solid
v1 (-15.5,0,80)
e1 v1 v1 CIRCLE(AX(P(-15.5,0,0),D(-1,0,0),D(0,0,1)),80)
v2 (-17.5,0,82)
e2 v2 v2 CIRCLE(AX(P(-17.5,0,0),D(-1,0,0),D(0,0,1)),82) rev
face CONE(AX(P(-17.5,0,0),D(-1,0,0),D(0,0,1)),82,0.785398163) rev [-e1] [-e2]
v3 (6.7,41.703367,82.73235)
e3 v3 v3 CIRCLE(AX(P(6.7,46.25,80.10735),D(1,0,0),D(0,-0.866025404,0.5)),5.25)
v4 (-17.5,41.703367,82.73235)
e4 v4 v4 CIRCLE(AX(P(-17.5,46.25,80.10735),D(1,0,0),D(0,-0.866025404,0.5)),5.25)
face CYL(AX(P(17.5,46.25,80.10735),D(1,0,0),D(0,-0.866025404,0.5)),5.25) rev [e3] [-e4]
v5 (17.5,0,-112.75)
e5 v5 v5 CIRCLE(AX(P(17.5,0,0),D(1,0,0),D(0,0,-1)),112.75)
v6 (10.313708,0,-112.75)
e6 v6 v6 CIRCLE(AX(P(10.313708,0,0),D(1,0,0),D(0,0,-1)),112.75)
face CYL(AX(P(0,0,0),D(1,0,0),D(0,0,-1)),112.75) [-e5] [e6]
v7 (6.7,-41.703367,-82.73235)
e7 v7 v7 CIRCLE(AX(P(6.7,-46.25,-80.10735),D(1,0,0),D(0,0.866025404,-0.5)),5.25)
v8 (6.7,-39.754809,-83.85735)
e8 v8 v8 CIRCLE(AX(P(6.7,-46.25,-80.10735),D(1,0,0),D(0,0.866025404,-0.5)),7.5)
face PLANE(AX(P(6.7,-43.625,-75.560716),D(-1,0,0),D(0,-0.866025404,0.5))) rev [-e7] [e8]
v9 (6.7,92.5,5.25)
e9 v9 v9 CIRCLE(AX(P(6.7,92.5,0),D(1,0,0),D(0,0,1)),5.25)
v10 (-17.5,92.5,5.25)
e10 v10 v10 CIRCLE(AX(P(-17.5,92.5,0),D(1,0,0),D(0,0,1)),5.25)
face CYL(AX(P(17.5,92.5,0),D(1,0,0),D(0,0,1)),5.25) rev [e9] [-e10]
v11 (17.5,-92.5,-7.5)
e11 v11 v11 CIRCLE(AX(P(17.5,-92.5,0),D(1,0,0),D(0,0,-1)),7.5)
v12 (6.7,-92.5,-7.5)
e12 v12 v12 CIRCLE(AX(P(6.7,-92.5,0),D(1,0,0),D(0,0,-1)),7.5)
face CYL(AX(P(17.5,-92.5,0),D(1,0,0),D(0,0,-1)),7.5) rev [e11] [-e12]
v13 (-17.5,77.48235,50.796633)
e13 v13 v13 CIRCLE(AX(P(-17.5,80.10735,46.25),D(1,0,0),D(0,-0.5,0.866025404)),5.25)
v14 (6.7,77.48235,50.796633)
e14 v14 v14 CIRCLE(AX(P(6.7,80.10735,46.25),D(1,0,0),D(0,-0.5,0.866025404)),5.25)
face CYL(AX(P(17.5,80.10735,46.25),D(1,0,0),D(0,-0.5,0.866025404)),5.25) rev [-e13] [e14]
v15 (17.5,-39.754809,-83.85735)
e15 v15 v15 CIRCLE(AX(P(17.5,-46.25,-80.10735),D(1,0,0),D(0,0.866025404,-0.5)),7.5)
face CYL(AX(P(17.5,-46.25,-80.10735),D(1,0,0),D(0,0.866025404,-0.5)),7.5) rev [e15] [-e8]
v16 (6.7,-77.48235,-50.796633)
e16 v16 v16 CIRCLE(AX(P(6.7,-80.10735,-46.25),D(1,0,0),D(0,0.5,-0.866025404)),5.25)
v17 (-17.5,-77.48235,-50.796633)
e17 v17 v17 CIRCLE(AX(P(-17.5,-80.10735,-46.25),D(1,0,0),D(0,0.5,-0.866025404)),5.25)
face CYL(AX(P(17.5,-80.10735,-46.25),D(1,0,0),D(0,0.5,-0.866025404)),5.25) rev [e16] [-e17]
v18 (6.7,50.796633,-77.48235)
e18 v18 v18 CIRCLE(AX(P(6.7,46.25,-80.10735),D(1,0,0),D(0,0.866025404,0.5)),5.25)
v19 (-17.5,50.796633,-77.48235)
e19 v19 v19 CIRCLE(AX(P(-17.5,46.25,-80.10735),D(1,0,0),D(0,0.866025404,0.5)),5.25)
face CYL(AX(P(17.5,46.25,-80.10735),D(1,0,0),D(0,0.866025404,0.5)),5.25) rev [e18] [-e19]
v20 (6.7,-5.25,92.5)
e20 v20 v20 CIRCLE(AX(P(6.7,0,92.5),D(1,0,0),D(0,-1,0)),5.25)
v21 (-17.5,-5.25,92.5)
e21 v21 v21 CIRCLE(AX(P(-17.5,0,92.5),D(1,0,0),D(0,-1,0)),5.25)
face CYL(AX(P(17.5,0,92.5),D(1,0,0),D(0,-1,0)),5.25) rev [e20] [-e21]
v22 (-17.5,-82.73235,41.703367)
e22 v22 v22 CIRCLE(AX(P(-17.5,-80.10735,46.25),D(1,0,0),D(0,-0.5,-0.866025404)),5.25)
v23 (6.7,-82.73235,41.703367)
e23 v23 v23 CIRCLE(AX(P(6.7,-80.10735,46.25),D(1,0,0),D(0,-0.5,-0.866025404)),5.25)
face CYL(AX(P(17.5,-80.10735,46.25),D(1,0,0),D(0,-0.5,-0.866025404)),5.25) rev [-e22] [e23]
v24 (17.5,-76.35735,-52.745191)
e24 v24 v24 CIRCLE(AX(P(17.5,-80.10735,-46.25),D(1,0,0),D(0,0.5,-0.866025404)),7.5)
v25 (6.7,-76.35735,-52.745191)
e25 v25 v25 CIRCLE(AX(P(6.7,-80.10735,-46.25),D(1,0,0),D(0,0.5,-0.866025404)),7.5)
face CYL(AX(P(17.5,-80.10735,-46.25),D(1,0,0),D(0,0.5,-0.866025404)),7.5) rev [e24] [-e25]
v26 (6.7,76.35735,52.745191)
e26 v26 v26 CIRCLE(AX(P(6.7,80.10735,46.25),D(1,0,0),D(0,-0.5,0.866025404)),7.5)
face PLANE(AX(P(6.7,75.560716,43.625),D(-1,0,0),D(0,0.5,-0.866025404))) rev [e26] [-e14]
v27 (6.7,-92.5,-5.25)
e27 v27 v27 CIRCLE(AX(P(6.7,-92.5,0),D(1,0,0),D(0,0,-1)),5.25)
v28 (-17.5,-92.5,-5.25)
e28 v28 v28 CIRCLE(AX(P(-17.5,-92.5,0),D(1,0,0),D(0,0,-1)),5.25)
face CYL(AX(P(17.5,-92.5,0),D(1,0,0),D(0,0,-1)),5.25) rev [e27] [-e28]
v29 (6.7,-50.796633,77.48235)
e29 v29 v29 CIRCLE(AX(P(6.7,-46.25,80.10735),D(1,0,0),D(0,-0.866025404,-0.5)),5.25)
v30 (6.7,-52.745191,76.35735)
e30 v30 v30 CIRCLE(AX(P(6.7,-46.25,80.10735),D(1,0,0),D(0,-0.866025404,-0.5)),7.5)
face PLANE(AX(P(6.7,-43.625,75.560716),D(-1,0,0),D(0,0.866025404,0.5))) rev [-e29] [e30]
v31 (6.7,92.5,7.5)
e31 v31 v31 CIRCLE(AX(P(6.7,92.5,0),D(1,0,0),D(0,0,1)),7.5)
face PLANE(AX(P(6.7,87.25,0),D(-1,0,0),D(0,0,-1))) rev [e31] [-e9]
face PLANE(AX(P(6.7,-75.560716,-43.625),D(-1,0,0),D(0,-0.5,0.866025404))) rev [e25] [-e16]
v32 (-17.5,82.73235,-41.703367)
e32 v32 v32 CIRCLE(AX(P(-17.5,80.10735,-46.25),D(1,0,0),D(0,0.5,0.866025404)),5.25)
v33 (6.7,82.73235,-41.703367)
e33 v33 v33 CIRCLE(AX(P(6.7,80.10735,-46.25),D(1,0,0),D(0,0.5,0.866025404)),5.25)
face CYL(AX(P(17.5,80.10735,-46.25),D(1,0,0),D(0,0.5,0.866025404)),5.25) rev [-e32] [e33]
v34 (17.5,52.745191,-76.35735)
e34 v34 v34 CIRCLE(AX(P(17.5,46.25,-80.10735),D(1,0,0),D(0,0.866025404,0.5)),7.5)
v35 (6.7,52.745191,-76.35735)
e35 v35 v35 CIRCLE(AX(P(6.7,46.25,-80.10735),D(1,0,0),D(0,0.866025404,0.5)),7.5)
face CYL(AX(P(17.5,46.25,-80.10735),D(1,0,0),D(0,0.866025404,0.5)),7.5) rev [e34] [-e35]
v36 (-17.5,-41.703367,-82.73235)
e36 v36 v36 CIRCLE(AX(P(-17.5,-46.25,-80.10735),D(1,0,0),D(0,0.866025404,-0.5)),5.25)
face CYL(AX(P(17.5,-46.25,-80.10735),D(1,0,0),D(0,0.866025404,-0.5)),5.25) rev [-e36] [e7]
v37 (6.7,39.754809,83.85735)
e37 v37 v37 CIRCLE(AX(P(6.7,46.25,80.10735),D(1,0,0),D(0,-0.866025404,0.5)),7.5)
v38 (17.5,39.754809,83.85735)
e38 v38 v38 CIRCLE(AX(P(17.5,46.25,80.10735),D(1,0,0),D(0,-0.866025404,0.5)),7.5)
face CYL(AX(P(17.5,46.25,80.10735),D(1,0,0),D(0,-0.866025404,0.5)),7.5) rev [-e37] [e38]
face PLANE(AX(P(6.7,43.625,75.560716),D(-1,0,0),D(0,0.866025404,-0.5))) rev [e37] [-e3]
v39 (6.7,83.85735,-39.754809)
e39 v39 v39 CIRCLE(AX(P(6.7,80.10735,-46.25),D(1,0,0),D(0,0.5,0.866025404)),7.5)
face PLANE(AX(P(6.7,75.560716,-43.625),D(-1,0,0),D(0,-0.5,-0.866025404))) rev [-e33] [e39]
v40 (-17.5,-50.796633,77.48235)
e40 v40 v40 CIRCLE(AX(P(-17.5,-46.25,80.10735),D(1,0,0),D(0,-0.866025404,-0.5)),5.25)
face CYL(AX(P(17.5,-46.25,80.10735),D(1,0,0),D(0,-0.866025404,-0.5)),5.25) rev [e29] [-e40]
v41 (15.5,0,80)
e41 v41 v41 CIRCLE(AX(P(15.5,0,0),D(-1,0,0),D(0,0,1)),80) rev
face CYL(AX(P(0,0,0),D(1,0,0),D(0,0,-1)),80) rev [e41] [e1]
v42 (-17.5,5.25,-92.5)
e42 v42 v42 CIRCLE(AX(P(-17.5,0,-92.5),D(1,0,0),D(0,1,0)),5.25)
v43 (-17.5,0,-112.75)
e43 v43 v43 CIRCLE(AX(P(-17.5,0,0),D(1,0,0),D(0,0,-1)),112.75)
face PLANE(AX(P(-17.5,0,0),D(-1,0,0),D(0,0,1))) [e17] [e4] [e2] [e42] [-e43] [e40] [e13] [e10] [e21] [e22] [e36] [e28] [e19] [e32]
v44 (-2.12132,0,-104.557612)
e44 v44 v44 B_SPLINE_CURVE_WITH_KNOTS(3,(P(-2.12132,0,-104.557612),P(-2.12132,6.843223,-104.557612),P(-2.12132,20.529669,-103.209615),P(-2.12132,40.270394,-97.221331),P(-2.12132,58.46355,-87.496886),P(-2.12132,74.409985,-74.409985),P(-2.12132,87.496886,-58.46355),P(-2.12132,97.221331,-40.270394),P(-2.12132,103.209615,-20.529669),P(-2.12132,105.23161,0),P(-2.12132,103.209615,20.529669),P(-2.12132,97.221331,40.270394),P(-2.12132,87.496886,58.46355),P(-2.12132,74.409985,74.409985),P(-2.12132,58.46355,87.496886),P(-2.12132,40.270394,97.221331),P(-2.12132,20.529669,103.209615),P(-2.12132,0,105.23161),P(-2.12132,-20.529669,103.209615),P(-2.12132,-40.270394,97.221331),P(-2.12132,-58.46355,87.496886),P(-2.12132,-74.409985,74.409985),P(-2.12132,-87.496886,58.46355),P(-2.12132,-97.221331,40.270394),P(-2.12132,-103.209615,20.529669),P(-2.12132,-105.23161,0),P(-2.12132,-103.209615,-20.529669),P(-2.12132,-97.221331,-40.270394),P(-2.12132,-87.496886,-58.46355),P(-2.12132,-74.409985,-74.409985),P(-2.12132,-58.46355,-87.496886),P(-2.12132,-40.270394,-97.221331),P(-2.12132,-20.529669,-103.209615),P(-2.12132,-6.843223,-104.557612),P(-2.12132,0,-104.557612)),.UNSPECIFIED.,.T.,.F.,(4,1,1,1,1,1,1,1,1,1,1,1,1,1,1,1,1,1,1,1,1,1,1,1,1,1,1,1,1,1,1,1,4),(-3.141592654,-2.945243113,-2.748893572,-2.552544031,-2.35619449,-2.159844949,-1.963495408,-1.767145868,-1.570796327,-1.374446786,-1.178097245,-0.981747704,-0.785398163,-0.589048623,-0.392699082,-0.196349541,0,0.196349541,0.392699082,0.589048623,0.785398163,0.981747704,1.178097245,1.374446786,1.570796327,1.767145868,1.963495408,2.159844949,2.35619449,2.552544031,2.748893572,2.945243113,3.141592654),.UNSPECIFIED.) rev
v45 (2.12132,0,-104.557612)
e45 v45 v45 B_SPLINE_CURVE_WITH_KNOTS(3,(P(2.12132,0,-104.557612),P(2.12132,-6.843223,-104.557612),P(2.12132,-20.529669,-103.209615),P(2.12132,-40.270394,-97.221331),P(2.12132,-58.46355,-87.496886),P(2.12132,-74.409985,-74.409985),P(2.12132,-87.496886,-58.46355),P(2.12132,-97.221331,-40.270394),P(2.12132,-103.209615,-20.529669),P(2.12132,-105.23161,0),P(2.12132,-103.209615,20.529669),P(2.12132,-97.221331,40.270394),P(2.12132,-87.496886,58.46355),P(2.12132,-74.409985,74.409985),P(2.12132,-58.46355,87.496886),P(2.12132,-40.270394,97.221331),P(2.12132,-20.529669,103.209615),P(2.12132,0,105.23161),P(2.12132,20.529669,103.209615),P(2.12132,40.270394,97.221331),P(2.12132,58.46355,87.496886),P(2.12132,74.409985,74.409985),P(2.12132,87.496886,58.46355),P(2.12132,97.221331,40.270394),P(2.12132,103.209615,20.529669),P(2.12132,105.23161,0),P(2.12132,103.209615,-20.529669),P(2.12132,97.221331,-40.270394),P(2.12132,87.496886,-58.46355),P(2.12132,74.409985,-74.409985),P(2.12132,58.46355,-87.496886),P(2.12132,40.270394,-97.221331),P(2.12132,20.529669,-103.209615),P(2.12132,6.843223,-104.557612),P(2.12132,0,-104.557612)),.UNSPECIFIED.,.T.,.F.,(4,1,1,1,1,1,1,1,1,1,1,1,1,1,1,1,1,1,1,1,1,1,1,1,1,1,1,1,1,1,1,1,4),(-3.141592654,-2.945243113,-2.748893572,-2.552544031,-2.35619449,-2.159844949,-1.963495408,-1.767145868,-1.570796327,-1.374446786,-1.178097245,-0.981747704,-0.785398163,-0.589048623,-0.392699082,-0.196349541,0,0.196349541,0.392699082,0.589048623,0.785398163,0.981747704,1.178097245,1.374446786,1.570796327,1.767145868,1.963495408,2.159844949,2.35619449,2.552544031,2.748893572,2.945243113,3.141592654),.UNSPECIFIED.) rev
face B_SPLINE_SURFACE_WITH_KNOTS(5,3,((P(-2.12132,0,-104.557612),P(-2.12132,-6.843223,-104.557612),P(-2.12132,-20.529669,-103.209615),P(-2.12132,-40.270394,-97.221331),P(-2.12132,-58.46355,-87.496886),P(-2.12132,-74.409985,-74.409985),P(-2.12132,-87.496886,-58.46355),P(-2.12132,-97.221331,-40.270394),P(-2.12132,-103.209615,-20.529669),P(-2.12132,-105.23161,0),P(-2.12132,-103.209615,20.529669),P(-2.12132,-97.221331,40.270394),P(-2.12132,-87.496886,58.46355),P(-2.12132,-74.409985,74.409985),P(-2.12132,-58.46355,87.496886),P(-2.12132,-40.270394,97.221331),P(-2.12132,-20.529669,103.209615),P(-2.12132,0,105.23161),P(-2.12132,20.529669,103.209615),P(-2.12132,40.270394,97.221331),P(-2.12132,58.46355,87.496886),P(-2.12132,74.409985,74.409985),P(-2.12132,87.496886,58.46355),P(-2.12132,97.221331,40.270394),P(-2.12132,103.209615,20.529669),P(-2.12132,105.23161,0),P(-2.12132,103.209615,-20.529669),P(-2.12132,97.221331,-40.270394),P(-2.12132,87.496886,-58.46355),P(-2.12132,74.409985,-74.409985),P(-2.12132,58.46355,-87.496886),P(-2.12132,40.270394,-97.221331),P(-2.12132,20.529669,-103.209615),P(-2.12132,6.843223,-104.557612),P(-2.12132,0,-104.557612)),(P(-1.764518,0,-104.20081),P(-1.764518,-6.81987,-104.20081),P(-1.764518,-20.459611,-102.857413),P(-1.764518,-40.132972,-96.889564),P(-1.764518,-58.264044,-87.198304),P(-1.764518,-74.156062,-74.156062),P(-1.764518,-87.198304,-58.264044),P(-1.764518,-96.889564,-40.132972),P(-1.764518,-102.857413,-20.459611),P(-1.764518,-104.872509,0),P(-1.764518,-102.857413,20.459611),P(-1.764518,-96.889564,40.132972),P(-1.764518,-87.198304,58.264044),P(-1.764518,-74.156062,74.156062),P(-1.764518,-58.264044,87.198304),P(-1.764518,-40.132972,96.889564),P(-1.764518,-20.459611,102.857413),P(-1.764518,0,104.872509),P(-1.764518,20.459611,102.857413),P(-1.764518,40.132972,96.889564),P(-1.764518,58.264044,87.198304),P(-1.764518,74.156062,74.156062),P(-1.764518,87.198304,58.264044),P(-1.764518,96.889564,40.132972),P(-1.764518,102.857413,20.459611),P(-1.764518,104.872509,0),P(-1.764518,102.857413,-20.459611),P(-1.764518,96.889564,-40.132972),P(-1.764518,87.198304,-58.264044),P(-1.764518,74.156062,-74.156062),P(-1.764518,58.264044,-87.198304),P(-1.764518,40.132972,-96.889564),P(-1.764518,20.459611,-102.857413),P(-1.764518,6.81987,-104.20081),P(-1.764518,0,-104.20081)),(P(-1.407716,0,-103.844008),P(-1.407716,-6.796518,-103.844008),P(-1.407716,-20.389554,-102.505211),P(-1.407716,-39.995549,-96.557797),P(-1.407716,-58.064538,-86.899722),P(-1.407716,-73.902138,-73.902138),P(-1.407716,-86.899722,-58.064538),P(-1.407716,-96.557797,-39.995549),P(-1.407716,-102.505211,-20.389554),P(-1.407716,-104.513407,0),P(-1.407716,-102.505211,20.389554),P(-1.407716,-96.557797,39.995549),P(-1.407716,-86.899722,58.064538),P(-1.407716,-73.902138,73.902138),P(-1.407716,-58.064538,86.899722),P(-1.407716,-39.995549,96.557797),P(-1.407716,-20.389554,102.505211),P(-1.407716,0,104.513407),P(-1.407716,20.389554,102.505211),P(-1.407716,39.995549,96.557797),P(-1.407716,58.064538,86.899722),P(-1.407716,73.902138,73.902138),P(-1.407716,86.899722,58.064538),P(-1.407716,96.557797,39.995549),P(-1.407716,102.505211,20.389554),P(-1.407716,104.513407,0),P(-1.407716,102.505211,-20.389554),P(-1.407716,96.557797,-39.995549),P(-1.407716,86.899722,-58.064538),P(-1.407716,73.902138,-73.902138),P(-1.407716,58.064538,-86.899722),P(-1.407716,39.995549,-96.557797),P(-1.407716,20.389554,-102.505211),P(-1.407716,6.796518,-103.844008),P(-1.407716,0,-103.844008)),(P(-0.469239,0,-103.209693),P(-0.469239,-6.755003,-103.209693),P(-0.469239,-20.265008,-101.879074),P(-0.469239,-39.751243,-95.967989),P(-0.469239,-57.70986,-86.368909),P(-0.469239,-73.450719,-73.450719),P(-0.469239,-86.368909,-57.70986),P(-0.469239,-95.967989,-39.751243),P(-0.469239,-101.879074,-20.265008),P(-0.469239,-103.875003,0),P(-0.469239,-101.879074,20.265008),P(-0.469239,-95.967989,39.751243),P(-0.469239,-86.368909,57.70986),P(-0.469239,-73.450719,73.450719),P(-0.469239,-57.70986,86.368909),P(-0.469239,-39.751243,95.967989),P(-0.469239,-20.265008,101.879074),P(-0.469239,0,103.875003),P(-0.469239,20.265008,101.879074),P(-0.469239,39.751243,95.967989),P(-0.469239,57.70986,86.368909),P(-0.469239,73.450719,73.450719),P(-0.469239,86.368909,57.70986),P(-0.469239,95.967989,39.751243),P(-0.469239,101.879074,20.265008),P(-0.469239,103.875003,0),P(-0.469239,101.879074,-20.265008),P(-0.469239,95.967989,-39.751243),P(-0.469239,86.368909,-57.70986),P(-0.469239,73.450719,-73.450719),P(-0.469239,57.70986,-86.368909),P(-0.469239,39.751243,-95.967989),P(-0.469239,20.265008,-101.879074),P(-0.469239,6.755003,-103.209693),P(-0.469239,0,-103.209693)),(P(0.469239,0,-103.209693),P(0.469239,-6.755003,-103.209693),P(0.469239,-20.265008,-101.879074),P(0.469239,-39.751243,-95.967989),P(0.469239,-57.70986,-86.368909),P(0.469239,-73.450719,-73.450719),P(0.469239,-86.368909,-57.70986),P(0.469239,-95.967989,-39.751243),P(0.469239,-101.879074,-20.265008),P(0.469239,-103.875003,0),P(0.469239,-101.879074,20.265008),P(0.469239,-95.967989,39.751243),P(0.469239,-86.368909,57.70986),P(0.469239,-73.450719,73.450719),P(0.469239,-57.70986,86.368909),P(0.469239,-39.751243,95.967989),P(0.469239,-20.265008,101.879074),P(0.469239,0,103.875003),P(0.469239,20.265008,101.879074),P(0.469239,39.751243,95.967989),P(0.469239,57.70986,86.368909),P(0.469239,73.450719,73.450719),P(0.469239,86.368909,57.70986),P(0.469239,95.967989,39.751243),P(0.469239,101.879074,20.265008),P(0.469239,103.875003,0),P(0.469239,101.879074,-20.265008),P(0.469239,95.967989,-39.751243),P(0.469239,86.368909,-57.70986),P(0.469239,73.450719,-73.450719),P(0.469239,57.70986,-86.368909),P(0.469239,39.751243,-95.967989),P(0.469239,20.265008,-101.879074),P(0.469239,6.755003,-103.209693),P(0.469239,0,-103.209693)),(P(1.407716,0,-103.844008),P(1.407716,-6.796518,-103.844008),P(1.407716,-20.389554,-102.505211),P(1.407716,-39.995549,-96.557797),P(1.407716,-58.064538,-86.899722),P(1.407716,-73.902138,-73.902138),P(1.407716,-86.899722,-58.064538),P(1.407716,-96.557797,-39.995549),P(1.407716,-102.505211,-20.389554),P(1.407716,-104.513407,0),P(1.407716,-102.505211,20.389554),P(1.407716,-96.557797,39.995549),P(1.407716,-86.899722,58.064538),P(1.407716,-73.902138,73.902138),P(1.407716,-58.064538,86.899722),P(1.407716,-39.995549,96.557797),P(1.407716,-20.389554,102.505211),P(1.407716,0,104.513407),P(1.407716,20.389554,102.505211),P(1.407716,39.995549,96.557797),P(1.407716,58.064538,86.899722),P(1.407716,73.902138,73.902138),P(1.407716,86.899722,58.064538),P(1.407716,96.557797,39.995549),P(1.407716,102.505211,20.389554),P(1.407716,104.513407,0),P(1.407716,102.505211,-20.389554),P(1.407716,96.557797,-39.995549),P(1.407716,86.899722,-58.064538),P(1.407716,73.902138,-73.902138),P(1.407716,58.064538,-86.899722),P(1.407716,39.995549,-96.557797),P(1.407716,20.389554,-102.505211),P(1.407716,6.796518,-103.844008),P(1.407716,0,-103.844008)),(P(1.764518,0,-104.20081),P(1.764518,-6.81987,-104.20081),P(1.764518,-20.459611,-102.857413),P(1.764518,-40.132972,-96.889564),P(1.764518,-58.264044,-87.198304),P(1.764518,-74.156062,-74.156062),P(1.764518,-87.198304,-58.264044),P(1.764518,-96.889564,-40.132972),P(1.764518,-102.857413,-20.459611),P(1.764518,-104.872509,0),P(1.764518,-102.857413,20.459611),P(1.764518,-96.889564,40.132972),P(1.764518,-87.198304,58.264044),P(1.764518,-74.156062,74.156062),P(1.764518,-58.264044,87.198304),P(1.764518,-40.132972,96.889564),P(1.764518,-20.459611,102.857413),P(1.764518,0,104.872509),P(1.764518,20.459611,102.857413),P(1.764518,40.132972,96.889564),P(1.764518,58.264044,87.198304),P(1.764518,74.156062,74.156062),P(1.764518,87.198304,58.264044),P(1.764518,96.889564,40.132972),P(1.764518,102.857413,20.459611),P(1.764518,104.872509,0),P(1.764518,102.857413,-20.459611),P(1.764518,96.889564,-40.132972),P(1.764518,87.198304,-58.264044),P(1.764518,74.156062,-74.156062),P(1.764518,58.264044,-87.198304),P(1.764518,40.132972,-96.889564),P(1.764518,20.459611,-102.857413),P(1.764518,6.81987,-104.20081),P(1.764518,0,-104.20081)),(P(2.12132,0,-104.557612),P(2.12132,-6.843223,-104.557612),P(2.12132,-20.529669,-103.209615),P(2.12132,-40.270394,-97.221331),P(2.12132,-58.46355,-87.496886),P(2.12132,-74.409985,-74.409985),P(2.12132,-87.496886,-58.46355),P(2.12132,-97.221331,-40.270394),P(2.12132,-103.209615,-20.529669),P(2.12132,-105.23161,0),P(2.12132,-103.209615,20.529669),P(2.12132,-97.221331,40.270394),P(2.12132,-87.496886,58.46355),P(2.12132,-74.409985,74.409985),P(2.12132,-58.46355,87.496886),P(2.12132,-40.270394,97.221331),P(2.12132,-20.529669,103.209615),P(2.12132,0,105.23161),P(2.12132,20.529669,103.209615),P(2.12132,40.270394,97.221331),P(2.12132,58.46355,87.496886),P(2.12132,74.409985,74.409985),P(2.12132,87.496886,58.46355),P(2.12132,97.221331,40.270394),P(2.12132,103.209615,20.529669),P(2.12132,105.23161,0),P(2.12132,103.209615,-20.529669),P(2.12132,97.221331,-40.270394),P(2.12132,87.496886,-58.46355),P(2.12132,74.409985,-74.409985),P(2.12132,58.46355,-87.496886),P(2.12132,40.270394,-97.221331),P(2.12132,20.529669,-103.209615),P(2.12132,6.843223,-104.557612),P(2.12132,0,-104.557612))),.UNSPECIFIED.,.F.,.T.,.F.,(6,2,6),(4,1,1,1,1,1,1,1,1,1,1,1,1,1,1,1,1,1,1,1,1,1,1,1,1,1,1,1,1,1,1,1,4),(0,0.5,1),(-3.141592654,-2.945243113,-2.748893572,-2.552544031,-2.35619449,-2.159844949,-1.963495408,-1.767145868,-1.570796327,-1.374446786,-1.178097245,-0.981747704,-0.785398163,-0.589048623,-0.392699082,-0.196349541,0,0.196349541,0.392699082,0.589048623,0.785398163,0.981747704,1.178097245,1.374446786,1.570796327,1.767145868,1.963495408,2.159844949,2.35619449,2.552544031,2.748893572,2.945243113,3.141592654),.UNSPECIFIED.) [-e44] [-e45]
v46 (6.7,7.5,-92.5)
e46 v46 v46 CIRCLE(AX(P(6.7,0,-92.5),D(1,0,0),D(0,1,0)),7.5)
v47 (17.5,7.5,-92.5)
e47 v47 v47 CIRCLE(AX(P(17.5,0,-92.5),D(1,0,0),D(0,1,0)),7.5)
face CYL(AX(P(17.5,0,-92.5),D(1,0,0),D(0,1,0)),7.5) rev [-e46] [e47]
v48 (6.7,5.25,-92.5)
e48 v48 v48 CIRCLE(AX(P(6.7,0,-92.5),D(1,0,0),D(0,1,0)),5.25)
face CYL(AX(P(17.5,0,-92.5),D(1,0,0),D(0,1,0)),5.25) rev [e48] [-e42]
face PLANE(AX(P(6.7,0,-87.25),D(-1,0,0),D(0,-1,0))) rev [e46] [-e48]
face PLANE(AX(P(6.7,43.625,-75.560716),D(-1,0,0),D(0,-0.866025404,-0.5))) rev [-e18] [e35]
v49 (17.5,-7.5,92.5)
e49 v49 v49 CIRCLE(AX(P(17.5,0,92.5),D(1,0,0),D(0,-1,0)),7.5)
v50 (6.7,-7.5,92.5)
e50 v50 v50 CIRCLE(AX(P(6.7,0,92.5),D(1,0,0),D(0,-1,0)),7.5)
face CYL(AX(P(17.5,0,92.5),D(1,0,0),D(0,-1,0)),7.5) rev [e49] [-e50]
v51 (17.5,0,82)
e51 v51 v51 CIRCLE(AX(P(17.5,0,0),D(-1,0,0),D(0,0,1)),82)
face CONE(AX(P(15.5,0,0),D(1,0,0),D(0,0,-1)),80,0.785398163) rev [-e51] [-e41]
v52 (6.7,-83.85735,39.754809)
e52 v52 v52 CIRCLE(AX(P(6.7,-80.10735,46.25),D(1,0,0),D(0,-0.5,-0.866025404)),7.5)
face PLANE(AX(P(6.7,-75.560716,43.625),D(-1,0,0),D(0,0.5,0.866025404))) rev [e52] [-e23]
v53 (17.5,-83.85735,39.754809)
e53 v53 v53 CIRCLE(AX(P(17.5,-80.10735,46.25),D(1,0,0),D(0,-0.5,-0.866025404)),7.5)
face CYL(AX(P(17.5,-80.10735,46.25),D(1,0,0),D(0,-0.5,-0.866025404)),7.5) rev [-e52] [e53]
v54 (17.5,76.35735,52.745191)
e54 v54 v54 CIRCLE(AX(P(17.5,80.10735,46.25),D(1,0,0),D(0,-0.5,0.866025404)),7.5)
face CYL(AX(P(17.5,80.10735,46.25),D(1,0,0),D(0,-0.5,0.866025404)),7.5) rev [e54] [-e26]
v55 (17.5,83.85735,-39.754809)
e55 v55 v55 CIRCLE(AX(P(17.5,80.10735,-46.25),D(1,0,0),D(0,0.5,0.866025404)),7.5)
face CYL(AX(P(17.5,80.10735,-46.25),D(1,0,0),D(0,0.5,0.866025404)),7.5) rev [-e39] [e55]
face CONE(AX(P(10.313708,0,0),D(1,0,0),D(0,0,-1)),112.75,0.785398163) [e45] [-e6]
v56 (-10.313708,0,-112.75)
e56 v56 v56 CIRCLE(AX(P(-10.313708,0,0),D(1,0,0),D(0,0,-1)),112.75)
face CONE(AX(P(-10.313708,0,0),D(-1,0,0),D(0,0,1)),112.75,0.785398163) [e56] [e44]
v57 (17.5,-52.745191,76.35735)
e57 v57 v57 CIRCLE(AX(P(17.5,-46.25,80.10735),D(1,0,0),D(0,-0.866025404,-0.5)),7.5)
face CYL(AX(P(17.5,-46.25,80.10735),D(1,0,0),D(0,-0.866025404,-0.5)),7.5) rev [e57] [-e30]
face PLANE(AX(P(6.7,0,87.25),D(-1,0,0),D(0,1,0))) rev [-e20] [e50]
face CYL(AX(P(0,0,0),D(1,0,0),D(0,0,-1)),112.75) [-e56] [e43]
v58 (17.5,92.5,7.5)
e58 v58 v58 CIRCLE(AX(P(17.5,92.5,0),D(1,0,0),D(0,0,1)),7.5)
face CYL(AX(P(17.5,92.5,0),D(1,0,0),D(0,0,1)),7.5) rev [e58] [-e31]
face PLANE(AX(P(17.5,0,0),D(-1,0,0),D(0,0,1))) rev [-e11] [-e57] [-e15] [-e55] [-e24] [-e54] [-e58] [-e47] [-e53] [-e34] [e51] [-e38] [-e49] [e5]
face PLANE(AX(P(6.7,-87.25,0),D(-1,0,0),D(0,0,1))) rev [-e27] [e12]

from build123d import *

# Parameters (mm, degrees)
CHAMFER1_SIZE                            = 2
FILLET1_SIZE                             = 3
CBORE_FOR_M10_HEX_HEAD_BOLT1_D           = 10.5
CBORE_FOR_M10_HEX_HEAD_BOLT1_CBORE_D     = 15
CBORE_FOR_M10_HEX_HEAD_BOLT1_CBORE_DEPTH = 10.8
CIRPATTERN1_COUNT                        = 12


with BuildPart() as part:
    # Sketch1 → Revolve1 (revolve)
    with BuildSketch(Plane.XY, mode=Mode.PRIVATE) as revolve1_sk:
        Polygon((17.5, 80), (17.5, 112.75), (10.313708499, 112.75), (0, 102.436291501), (-10.313708499, 112.75), (-17.5, 112.75), (-17.5, 80), align=None)
    revolve(revolve1_sk.sketch.rotate(Axis((0, 0, 0), (-1, 0, 0)), 90), axis=Axis((0, 0, 0), (-1, 0, 0)))

    # Chamfer1
    chamfer1_edges = [part.edges().sort_by_distance(p)[0] for p in [
        (17.5, 0, 80),
        (-17.5, 0, 80),
    ]]
    chamfer(chamfer1_edges, length=CHAMFER1_SIZE)

    # Fillet1
    # a fillet whose section is not a circle: 3 mm, written as the material it adds along each edge
    with BuildSketch(Plane(origin=(0, 0, 0), x_dir=(0, 0, -1), z_dir=(0, 1, 0))) as fillet1_piece_1:
        with BuildLine():
            add(Edge.make_bspline([(102.436291501 + FILLET1_SIZE * 0.707106781187, FILLET1_SIZE * 0.707106781187), (102.436291501 + FILLET1_SIZE * 0.588172798365, FILLET1_SIZE * 0.588172798365), (102.436291501 + FILLET1_SIZE * 0.469238815543, FILLET1_SIZE * 0.469238815543), (102.436291501 + FILLET1_SIZE * 0.257800623859, FILLET1_SIZE * 0.156412938514), (102.436291501 + FILLET1_SIZE * 0.257800623859, -FILLET1_SIZE * 0.156412938514), (102.436291501 + FILLET1_SIZE * 0.469238815543, -FILLET1_SIZE * 0.469238815543), (102.436291501 + FILLET1_SIZE * 0.588172798365, -FILLET1_SIZE * 0.588172798365), (102.436291501 + FILLET1_SIZE * 0.707106781187, -FILLET1_SIZE * 0.707106781187)], knots=[0, 0, 0, 0, 0, 0, 0.5, 0.5, 1, 1, 1, 1, 1, 1], degree=5))
            Line((102.436291501 + FILLET1_SIZE * 0.707106781187, -FILLET1_SIZE * 0.707106781187), (102.436291501, 0))
            Line((102.436291501, 0), (102.436291501 + FILLET1_SIZE * 0.707106781187, FILLET1_SIZE * 0.707106781187))
        make_face()
    revolve(axis=Axis((0, 0, 0), (-1, 0, 0)))

    # CBORE for M10 Hex Head Bolt1 (through all)
    with Locations(Plane(origin=(17.5, -92.5, 0), x_dir=(0, 0, 1), z_dir=(1, 0, 0))):
        with Locations((0, 0)):
            cbore_for_m10_hex_head_bolt1 = CounterBoreHole(CBORE_FOR_M10_HEX_HEAD_BOLT1_D / 2, CBORE_FOR_M10_HEX_HEAD_BOLT1_CBORE_D / 2, CBORE_FOR_M10_HEX_HEAD_BOLT1_CBORE_DEPTH)

    # CirPattern1: CBORE for M10 Hex Head Bolt1 ×12 about axis
    cirpattern1_axis = Axis((0, 0, 0), (1, 0, 0))
    for i in range(1, CIRPATTERN1_COUNT):
        add(cbore_for_m10_hex_head_bolt1.rotate(cirpattern1_axis, i * 360 / CIRPATTERN1_COUNT), mode=Mode.SUBTRACT)


solid = part.part
